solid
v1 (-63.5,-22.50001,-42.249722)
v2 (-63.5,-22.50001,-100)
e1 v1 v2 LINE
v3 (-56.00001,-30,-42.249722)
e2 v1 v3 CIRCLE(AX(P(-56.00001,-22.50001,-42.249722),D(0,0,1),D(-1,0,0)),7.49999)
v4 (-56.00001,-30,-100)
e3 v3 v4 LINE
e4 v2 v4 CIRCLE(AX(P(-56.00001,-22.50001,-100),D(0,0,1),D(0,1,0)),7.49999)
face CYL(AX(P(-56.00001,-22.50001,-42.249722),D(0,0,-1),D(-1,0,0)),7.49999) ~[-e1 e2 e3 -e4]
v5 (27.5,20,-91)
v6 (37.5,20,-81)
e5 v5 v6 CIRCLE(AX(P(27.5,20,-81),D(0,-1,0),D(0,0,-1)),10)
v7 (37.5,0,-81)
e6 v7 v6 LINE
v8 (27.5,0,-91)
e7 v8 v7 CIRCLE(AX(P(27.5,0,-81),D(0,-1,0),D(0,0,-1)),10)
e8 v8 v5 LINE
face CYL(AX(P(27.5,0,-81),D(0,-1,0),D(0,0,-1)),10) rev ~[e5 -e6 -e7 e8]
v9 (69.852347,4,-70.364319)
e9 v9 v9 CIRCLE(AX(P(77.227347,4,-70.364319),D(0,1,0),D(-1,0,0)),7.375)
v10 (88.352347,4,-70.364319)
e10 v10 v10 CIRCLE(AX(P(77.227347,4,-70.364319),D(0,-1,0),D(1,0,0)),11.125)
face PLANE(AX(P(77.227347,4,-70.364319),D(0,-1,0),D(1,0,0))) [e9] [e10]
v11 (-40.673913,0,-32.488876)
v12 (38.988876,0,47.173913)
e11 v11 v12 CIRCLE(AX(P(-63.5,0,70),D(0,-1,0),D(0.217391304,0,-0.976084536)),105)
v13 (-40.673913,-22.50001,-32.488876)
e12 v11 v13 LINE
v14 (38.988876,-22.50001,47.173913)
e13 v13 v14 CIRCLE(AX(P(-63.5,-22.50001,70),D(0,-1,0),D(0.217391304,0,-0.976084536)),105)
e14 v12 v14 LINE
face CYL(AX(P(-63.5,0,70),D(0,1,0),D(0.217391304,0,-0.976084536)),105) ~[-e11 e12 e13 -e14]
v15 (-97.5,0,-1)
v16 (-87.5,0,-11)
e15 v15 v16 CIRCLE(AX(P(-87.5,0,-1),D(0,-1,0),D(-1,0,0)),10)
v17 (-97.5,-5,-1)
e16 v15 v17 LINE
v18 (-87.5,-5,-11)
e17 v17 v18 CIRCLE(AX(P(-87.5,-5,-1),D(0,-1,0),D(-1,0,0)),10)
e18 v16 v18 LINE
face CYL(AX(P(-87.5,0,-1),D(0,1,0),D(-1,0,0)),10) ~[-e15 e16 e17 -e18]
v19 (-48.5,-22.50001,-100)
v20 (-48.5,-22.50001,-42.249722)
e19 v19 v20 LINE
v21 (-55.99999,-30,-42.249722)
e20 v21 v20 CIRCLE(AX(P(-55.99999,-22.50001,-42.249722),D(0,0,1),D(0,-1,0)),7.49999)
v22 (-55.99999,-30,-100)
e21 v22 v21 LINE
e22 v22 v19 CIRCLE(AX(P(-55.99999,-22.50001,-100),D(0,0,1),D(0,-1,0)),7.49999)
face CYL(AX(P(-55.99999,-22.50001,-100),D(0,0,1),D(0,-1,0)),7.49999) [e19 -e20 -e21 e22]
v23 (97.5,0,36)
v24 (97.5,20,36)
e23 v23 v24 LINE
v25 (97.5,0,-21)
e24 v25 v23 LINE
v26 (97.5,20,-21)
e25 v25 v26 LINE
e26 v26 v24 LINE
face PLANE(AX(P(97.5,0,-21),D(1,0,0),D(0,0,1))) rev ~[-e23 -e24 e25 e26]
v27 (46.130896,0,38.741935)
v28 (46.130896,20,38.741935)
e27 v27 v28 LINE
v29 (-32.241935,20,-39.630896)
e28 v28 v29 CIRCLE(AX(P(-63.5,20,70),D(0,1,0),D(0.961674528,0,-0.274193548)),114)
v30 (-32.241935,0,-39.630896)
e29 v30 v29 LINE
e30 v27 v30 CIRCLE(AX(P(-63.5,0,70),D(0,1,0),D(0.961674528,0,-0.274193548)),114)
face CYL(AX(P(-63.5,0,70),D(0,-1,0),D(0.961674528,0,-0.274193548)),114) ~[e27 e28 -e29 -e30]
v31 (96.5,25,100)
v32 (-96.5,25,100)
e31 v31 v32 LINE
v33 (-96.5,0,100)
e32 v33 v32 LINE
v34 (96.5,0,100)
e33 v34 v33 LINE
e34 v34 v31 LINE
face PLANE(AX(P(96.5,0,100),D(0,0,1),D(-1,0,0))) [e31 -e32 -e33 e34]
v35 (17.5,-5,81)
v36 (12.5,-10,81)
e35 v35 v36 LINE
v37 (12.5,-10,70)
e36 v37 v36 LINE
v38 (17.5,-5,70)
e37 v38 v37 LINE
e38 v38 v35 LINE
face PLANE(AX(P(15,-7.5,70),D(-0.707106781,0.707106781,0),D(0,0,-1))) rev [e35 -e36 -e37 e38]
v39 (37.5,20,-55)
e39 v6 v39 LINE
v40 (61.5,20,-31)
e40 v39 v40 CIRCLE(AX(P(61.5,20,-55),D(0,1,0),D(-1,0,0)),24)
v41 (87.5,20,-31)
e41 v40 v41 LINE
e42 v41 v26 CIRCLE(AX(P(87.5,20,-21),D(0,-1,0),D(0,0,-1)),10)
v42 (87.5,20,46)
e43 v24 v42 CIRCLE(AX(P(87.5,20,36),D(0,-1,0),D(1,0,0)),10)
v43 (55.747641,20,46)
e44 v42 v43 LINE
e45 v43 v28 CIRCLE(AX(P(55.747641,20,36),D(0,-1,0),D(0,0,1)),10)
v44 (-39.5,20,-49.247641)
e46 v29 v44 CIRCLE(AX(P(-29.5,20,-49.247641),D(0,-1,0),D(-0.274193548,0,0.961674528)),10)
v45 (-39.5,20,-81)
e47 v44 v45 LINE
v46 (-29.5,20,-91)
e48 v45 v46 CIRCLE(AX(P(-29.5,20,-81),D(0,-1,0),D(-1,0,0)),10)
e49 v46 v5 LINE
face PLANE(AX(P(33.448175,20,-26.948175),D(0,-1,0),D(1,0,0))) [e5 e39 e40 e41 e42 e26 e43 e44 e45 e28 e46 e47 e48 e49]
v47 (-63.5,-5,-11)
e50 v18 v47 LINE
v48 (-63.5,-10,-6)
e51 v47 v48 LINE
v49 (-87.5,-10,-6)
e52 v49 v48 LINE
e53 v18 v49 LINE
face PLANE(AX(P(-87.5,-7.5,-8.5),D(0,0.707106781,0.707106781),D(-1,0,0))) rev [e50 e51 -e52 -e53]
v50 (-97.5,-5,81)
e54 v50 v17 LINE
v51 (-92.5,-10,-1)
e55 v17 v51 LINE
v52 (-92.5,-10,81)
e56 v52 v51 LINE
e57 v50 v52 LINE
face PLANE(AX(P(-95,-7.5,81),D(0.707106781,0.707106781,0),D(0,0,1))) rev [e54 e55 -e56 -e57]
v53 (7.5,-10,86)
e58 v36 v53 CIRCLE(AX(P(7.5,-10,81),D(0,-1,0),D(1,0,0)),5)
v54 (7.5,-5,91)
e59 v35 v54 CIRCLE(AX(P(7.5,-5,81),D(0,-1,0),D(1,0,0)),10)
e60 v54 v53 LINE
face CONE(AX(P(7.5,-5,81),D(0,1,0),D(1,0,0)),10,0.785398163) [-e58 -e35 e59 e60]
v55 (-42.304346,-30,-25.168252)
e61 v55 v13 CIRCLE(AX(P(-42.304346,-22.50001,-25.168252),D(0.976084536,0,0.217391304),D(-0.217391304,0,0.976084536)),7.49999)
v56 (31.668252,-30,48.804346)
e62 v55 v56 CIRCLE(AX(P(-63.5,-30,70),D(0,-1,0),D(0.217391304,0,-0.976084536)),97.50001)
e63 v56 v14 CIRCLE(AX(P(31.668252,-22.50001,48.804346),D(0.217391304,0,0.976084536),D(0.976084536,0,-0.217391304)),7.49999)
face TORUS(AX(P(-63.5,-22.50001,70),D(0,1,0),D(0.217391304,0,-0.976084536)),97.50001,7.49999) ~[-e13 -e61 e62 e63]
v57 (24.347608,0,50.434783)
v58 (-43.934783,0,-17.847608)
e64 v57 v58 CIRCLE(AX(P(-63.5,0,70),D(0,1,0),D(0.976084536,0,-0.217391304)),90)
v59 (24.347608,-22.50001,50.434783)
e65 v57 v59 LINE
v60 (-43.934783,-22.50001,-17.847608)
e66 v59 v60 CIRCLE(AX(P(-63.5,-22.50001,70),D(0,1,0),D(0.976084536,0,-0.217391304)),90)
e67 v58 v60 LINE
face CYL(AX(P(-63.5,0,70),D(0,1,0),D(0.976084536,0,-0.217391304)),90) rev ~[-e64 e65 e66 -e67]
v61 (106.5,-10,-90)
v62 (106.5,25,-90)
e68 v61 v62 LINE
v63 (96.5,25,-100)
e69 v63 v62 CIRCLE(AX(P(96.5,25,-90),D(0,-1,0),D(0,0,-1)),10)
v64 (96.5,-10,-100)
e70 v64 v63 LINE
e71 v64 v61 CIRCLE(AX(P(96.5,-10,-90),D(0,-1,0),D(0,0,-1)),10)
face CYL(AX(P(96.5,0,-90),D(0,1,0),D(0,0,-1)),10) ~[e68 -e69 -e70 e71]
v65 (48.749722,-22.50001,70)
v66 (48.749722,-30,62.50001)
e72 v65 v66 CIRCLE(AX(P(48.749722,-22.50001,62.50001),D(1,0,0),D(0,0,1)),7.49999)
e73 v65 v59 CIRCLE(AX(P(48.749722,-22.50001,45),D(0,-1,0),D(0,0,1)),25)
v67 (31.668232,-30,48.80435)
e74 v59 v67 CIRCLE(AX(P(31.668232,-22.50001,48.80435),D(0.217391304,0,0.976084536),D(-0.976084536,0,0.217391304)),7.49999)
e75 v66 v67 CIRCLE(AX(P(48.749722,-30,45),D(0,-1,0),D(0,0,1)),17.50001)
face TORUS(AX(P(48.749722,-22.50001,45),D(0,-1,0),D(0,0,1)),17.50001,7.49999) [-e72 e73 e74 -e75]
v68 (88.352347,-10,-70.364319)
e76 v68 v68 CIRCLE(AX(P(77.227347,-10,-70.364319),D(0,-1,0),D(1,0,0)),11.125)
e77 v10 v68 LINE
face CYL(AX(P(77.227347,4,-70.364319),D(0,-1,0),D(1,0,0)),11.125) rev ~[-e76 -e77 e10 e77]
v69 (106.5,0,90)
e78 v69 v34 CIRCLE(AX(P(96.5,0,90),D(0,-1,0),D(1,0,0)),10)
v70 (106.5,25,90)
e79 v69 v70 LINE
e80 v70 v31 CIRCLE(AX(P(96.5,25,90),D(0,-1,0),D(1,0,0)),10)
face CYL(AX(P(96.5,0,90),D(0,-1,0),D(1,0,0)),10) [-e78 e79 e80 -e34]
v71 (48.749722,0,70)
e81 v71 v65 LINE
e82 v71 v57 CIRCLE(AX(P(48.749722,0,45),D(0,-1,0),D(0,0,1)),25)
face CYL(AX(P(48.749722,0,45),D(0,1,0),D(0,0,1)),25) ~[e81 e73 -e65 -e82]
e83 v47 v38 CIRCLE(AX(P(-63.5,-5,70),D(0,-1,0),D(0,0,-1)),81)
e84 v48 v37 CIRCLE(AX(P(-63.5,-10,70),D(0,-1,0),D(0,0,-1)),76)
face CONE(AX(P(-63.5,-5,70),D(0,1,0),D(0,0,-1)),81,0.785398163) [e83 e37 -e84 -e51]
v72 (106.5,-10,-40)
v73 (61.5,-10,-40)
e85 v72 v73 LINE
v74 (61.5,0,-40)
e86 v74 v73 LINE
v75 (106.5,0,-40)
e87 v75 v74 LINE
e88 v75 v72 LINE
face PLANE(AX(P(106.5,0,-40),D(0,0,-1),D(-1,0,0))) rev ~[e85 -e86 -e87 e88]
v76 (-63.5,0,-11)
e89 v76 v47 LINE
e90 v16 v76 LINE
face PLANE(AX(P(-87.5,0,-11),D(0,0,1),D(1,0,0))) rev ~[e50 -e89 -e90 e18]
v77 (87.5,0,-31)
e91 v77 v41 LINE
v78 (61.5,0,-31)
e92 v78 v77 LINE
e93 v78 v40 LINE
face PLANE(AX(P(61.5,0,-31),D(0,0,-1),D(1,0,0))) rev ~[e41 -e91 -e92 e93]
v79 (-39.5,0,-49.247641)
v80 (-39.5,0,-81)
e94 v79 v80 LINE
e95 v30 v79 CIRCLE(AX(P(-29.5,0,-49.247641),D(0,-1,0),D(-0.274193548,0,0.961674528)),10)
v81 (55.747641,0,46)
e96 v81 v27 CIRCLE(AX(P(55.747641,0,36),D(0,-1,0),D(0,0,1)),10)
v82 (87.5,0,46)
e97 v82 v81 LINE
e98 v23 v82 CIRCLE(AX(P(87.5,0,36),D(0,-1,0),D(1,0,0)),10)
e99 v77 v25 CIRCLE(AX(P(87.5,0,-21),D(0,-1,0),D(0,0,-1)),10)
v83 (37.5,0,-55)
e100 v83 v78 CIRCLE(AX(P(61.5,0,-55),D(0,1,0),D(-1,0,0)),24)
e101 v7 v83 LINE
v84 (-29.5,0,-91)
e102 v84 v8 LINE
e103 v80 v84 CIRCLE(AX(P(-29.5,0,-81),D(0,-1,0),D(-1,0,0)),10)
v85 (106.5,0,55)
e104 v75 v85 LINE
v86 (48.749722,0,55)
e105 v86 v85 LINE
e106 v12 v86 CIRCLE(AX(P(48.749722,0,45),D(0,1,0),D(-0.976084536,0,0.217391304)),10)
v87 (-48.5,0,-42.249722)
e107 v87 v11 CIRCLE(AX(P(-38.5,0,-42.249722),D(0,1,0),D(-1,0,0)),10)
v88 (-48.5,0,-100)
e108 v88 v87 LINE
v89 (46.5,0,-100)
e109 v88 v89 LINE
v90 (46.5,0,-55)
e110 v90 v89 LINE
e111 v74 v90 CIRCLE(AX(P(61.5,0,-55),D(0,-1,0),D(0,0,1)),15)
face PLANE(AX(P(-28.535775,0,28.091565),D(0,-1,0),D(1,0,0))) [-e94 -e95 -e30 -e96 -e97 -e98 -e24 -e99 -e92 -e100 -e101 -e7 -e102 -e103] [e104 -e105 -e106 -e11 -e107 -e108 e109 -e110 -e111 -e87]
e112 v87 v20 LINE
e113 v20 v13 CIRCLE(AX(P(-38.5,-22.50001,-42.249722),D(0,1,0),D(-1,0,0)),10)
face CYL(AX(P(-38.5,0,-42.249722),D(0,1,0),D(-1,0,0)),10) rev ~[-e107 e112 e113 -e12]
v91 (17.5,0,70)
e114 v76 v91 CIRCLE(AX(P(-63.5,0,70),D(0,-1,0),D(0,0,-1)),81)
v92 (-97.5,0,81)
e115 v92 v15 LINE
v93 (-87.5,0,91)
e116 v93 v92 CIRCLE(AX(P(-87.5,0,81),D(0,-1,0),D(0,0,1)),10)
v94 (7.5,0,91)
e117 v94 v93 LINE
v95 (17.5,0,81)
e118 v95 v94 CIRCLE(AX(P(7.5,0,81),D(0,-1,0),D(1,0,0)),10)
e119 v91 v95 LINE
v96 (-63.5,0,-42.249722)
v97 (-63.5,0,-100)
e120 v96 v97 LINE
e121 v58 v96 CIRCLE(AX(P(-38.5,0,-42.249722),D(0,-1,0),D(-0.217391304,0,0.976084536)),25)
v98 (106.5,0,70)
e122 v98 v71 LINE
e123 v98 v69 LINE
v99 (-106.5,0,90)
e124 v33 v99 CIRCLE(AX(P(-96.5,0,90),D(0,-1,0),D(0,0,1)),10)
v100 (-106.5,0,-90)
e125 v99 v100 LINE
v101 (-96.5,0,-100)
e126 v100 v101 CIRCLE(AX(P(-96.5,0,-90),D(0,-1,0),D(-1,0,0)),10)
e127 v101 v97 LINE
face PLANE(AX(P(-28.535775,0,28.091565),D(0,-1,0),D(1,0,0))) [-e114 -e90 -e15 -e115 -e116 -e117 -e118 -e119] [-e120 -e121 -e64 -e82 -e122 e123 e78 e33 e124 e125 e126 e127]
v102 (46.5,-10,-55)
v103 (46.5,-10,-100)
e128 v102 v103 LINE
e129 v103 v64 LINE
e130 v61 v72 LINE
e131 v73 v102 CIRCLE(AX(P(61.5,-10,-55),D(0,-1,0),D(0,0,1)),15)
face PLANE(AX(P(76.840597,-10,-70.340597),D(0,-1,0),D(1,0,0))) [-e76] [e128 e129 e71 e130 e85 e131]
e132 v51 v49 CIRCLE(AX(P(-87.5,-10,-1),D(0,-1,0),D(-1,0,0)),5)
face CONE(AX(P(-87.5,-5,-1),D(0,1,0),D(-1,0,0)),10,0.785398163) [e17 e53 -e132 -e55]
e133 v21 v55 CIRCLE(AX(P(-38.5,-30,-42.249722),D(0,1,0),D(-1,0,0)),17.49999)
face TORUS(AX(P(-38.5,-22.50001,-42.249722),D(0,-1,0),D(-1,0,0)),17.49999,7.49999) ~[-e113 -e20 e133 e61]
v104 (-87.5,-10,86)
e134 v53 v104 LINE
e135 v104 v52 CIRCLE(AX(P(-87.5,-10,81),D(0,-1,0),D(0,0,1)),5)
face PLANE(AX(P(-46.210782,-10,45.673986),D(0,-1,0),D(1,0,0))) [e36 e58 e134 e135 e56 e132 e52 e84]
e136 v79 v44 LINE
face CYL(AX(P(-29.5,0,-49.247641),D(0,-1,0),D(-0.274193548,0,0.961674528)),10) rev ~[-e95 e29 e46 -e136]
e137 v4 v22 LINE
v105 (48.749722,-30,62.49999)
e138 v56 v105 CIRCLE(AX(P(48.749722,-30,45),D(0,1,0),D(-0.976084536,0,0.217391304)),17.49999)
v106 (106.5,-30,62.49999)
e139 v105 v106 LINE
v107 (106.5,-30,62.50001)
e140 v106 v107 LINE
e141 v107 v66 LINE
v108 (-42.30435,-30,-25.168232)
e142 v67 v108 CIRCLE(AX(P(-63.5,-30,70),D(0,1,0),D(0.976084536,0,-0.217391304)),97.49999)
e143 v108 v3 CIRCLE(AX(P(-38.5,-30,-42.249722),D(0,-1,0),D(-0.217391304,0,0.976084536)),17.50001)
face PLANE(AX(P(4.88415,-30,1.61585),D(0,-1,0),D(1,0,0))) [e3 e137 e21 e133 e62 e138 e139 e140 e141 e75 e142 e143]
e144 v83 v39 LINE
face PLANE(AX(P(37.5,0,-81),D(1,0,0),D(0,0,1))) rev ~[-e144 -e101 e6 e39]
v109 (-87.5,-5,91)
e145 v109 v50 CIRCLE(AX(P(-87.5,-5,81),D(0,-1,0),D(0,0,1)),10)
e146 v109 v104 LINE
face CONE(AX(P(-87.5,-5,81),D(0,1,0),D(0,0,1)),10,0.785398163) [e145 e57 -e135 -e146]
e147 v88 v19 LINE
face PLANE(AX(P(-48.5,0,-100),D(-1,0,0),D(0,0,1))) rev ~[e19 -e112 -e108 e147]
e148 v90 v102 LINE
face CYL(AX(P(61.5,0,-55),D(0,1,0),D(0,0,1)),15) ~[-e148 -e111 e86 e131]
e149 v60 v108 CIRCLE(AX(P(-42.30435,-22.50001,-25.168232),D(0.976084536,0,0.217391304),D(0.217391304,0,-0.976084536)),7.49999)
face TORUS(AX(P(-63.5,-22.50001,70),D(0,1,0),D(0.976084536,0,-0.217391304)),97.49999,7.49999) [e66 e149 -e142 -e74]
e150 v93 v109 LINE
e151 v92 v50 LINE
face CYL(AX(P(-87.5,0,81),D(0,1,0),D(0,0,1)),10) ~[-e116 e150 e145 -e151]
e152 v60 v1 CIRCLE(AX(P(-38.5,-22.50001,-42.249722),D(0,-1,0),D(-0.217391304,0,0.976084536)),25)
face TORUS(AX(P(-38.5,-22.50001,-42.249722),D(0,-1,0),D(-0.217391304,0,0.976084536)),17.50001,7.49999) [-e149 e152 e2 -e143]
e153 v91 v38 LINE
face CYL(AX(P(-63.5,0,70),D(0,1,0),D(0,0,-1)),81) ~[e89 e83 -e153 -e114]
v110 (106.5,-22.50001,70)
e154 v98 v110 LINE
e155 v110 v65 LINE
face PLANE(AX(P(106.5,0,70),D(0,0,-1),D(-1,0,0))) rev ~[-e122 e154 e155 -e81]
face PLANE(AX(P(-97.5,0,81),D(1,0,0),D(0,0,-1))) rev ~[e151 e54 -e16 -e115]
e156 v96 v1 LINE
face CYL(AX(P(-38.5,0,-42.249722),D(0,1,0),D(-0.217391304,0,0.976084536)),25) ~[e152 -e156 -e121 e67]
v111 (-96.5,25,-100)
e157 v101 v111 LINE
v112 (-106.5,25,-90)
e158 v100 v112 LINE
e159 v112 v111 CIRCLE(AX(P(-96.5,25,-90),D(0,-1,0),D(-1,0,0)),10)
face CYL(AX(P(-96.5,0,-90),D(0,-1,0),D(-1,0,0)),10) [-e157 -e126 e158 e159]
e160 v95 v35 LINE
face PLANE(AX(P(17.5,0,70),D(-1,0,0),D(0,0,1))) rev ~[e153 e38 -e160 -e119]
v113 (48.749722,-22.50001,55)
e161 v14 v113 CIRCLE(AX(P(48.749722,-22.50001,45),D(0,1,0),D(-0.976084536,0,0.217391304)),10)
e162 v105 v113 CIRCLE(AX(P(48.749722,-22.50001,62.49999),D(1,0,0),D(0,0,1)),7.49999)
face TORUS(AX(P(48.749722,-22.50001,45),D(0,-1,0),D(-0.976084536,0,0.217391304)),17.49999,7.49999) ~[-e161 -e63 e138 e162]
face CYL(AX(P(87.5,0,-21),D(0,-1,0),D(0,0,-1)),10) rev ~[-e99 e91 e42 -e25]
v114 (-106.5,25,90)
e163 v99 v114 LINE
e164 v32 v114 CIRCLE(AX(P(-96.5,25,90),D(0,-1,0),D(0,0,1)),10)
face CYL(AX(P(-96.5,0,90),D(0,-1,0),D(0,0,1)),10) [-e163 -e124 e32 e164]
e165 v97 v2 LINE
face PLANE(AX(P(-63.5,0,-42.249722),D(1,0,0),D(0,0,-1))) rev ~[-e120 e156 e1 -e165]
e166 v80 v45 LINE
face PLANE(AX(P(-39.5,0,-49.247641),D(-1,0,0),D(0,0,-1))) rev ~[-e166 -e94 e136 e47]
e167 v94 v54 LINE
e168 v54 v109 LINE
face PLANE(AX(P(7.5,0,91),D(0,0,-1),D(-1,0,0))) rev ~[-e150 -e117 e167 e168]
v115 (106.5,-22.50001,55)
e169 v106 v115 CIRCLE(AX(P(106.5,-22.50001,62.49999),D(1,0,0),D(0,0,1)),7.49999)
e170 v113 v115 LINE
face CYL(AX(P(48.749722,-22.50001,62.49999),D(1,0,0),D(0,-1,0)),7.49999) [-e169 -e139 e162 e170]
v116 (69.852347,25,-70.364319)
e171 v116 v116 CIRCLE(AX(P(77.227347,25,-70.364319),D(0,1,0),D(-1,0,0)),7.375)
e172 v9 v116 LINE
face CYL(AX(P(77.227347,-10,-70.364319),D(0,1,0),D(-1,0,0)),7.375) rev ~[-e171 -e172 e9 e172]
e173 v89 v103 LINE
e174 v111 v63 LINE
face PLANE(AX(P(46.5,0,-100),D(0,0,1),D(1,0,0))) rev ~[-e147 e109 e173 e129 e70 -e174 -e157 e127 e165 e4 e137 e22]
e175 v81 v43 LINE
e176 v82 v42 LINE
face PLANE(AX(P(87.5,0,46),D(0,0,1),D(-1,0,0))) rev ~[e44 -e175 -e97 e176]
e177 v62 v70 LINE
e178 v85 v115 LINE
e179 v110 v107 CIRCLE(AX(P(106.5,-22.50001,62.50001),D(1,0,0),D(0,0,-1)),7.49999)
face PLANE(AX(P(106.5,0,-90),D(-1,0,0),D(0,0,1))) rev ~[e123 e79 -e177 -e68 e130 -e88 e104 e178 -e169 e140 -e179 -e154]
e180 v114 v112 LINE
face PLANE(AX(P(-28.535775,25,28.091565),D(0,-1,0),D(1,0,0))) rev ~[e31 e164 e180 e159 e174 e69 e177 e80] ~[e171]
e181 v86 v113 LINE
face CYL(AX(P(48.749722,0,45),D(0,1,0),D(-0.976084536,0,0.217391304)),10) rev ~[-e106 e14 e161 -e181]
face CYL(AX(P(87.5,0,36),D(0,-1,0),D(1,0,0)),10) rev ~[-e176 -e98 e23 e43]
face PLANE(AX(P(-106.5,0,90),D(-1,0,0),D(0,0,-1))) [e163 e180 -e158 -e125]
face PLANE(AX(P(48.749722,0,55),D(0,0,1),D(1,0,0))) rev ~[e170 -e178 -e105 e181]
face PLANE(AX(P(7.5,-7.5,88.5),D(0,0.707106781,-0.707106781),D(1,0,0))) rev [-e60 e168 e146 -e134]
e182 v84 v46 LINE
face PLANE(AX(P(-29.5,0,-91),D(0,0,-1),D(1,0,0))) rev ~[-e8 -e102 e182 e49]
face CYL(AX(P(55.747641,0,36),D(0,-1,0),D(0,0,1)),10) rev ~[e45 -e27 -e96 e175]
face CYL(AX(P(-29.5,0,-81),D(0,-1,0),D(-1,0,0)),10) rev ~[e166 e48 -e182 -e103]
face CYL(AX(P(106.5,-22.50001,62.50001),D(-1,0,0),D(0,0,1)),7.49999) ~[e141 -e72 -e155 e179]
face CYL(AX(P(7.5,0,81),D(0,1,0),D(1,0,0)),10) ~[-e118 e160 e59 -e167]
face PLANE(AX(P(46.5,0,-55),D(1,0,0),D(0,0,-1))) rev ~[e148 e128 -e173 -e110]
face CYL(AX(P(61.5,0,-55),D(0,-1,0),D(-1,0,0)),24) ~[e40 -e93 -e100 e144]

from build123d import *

# Parameters (mm, degrees)
F1_DEPTH       = 25
F2_DEPTH       = 10
F3_DEPTH       = 30
F4_DEPTH       = 20
F5_DEPTH       = 10
F7_D           = 14.75
F7_CBORE_D     = 22.25
F7_CBORE_DEPTH = 14
F8_SIZE        = 5
F9_R           = 7.49999


# Not quite as in the source:
# - a fillet or chamfer is up to 0.001 mm smaller than in the source, because OpenCascade refuses the exact size


with BuildPart() as f1:
    # F0 (on Front) → F1 (new body)
    with BuildSketch(Plane.XZ):
        with BuildLine():
            Line((96.5, 100), (-96.5, 100))
            ThreePointArc((-96.5, 100), (-103.5710678119, 97.0710678119), (-106.5, 90))
            Line((-106.5, 90), (-106.5, -90))
            ThreePointArc((-106.5, -90), (-103.5710678119, -97.0710678119), (-96.5, -100))
            Line((-96.5, -100), (-63.5, -100))
            Line((-63.5, -100), (-63.5, -42.2497216032))
            ThreePointArc((-63.5, -42.2497216032), (-58.0047374401, -26.6111405489), (-43.9347826087, -17.8476082112))
            ThreePointArc((-43.9347826087, -17.8476082112), (0.1396103068, 6.3603896932), (24.3476082112, 50.4347826087))
            ThreePointArc((24.3476082112, 50.4347826087), (33.1111405489, 64.5047374401), (48.7497216032, 70))
            Line((48.7497216032, 70), (106.5, 70))
            Line((106.5, 70), (106.5, 90))
            ThreePointArc((106.5, 90), (103.5710678119, 97.0710678119), (96.5, 100))
        make_face()
        with BuildLine():
            ThreePointArc((17.5, 70), (-6.2243507239, 12.7243507239), (-63.5, -11))
            Line((-63.5, -11), (-87.5, -11))
            ThreePointArc((-87.5, -11), (-94.5710678119, -8.0710678119), (-97.5, -1))
            Line((-97.5, -1), (-97.5, 81))
            ThreePointArc((-97.5, 81), (-94.5710678119, 88.0710678119), (-87.5, 91))
            Line((-87.5, 91), (7.5, 91))
            ThreePointArc((7.5, 91), (14.5710678119, 88.0710678119), (17.5, 81))
            Line((17.5, 81), (17.5, 70))
        make_face(mode=Mode.SUBTRACT)
        with BuildLine():
            Line((106.5, 55), (106.5, 70))
            Line((106.5, 70), (48.7497216032, 70))
            ThreePointArc((48.7497216032, 70), (33.1111405489, 64.5047374401), (24.3476082112, 50.4347826087))
            ThreePointArc((24.3476082112, 50.4347826087), (0.1396103068, 6.3603896932), (-43.9347826087, -17.8476082112))
            ThreePointArc((-43.9347826087, -17.8476082112), (-58.0047374401, -26.6111405489), (-63.5, -42.2497216032))
            Line((-63.5, -42.2497216032), (-63.5, -100))
            Line((-63.5, -100), (-48.5, -100))
            Line((-48.5, -100), (-48.5, -42.2497216032))
            ThreePointArc((-48.5, -42.2497216032), (-46.3018949761, -35.9942891815), (-40.6739130435, -32.4888762464))
            ThreePointArc((-40.6739130435, -32.4888762464), (10.7462120246, -4.2462120246), (38.9888762464, 47.1739130435))
            ThreePointArc((38.9888762464, 47.1739130435), (42.4942891815, 52.8018949761), (48.7497216032, 55))
            Line((48.7497216032, 55), (106.5, 55))
        make_face()
        with BuildLine():
            Line((106.5, -40), (106.5, 55))
            Line((106.5, 55), (48.7497216032, 55))
            ThreePointArc((48.7497216032, 55), (42.4942891815, 52.8018949761), (38.9888762464, 47.1739130435))
            ThreePointArc((38.9888762464, 47.1739130435), (10.7462120246, -4.2462120246), (-40.6739130435, -32.4888762464))
            ThreePointArc((-40.6739130435, -32.4888762464), (-46.3018949761, -35.9942891815), (-48.5, -42.2497216032))
            Line((-48.5, -42.2497216032), (-48.5, -100))
            Line((-48.5, -100), (46.5, -100))
            Line((46.5, -100), (46.5, -55))
            ThreePointArc((46.5, -55), (50.8933982822, -44.3933982822), (61.5, -40))
            Line((61.5, -40), (106.5, -40))
        make_face()
        with BuildLine():
            ThreePointArc((46.130896205, 38.7419354839), (49.7234965193, 43.981834214), (55.7476414861, 46))
            Line((55.7476414861, 46), (87.5, 46))
            ThreePointArc((87.5, 46), (94.5710678119, 43.0710678119), (97.5, 36))
            Line((97.5, 36), (97.5, -21))
            ThreePointArc((97.5, -21), (94.5710678119, -28.0710678119), (87.5, -31))
            Line((87.5, -31), (61.5, -31))
            ThreePointArc((61.5, -31), (44.5294372515, -38.0294372515), (37.5, -55))
            Line((37.5, -55), (37.5, -81))
            ThreePointArc((37.5, -81), (34.5710678119, -88.0710678119), (27.5, -91))
            Line((27.5, -91), (-29.5, -91))
            ThreePointArc((-29.5, -91), (-36.5710678119, -88.0710678119), (-39.5, -81))
            Line((-39.5, -81), (-39.5, -49.2476414861))
            ThreePointArc((-39.5, -49.2476414861), (-37.481834214, -43.2234965193), (-32.2419354839, -39.630896205))
            ThreePointArc((-32.2419354839, -39.630896205), (17.1101730553, -10.6101730553), (46.130896205, 38.7419354839))
        make_face(mode=Mode.SUBTRACT)
        with BuildLine():
            Line((106.5, -90), (106.5, -40))
            Line((106.5, -40), (61.5, -40))
            ThreePointArc((61.5, -40), (50.8933982822, -44.3933982822), (46.5, -55))
            Line((46.5, -55), (46.5, -100))
            Line((46.5, -100), (96.5, -100))
            ThreePointArc((96.5, -100), (103.5710678119, -97.0710678119), (106.5, -90))
        make_face()
        with BuildLine():
            Line((-87.5, -11), (-63.5, -11))
            ThreePointArc((-63.5, -11), (-6.2243507239, 12.7243507239), (17.5, 70))
            Line((17.5, 70), (17.5, 81))
            ThreePointArc((17.5, 81), (14.5710678119, 88.0710678119), (7.5, 91))
            Line((7.5, 91), (-87.5, 91))
            ThreePointArc((-87.5, 91), (-94.5710678119, 88.0710678119), (-97.5, 81))
            Line((-97.5, 81), (-97.5, -1))
            ThreePointArc((-97.5, -1), (-94.5710678119, -8.0710678119), (-87.5, -11))
        make_face()
        with BuildLine():
            Line((87.5, 46), (55.7476414861, 46))
            ThreePointArc((55.7476414861, 46), (49.7234965193, 43.981834214), (46.130896205, 38.7419354839))
            ThreePointArc((46.130896205, 38.7419354839), (17.1101730553, -10.6101730553), (-32.2419354839, -39.630896205))
            ThreePointArc((-32.2419354839, -39.630896205), (-37.481834214, -43.2234965193), (-39.5, -49.2476414861))
            Line((-39.5, -49.2476414861), (-39.5, -81))
            ThreePointArc((-39.5, -81), (-36.5710678119, -88.0710678119), (-29.5, -91))
            Line((-29.5, -91), (27.5, -91))
            ThreePointArc((27.5, -91), (34.5710678119, -88.0710678119), (37.5, -81))
            Line((37.5, -81), (37.5, -55))
            ThreePointArc((37.5, -55), (44.5294372515, -38.0294372515), (61.5, -31))
            Line((61.5, -31), (87.5, -31))
            ThreePointArc((87.5, -31), (94.5710678119, -28.0710678119), (97.5, -21))
            Line((97.5, -21), (97.5, 36))
            ThreePointArc((97.5, 36), (94.5710678119, 43.0710678119), (87.5, 46))
        make_face()
    extrude(amount=-F1_DEPTH)

    # F0 (on Front) → F2 (join)
    with BuildSketch(Plane.XZ):
        with BuildLine():
            Line((-87.5, -11), (-63.5, -11))
            ThreePointArc((-63.5, -11), (-6.2243507239, 12.7243507239), (17.5, 70))
            Line((17.5, 70), (17.5, 81))
            ThreePointArc((17.5, 81), (14.5710678119, 88.0710678119), (7.5, 91))
            Line((7.5, 91), (-87.5, 91))
            ThreePointArc((-87.5, 91), (-94.5710678119, 88.0710678119), (-97.5, 81))
            Line((-97.5, 81), (-97.5, -1))
            ThreePointArc((-97.5, -1), (-94.5710678119, -8.0710678119), (-87.5, -11))
        make_face()
    extrude(amount=F2_DEPTH)

    # F0 (on Front) → F3 (join)
    with BuildSketch(Plane.XZ):
        with BuildLine():
            Line((106.5, 55), (106.5, 70))
            Line((106.5, 70), (48.7497216032, 70))
            ThreePointArc((48.7497216032, 70), (33.1111405489, 64.5047374401), (24.3476082112, 50.4347826087))
            ThreePointArc((24.3476082112, 50.4347826087), (0.1396103068, 6.3603896932), (-43.9347826087, -17.8476082112))
            ThreePointArc((-43.9347826087, -17.8476082112), (-58.0047374401, -26.6111405489), (-63.5, -42.2497216032))
            Line((-63.5, -42.2497216032), (-63.5, -100))
            Line((-63.5, -100), (-48.5, -100))
            Line((-48.5, -100), (-48.5, -42.2497216032))
            ThreePointArc((-48.5, -42.2497216032), (-46.3018949761, -35.9942891815), (-40.6739130435, -32.4888762464))
            ThreePointArc((-40.6739130435, -32.4888762464), (10.7462120246, -4.2462120246), (38.9888762464, 47.1739130435))
            ThreePointArc((38.9888762464, 47.1739130435), (42.4942891815, 52.8018949761), (48.7497216032, 55))
            Line((48.7497216032, 55), (106.5, 55))
        make_face()
    extrude(amount=F3_DEPTH)

    # F0 (on Front) → F4 (cut)
    with BuildSketch(Plane.XZ):
        with BuildLine():
            Line((87.5, 46), (55.7476414861, 46))
            ThreePointArc((55.7476414861, 46), (49.7234965193, 43.981834214), (46.130896205, 38.7419354839))
            ThreePointArc((46.130896205, 38.7419354839), (17.1101730553, -10.6101730553), (-32.2419354839, -39.630896205))
            ThreePointArc((-32.2419354839, -39.630896205), (-37.481834214, -43.2234965193), (-39.5, -49.2476414861))
            Line((-39.5, -49.2476414861), (-39.5, -81))
            ThreePointArc((-39.5, -81), (-36.5710678119, -88.0710678119), (-29.5, -91))
            Line((-29.5, -91), (27.5, -91))
            ThreePointArc((27.5, -91), (34.5710678119, -88.0710678119), (37.5, -81))
            Line((37.5, -81), (37.5, -55))
            ThreePointArc((37.5, -55), (44.5294372515, -38.0294372515), (61.5, -31))
            Line((61.5, -31), (87.5, -31))
            ThreePointArc((87.5, -31), (94.5710678119, -28.0710678119), (97.5, -21))
            Line((97.5, -21), (97.5, 36))
            ThreePointArc((97.5, 36), (94.5710678119, 43.0710678119), (87.5, 46))
        make_face()
    extrude(amount=-F4_DEPTH, mode=Mode.SUBTRACT)

    # F0 (on Front) → F5 (join)
    with BuildSketch(Plane.XZ):
        with BuildLine():
            Line((106.5, -90), (106.5, -40))
            Line((106.5, -40), (61.5, -40))
            ThreePointArc((61.5, -40), (50.8933982822, -44.3933982822), (46.5, -55))
            Line((46.5, -55), (46.5, -100))
            Line((46.5, -100), (96.5, -100))
            ThreePointArc((96.5, -100), (103.5710678119, -97.0710678119), (106.5, -90))
        make_face()
    extrude(amount=F5_DEPTH)

    # F7 (through all)
    with Locations(Plane.XZ.offset(10)):
        with Locations((77.2273465991, -70.3643187881)):
            CounterBoreHole(F7_D / 2, F7_CBORE_D / 2, F7_CBORE_DEPTH)

    # F8
    f8_edges = [f1.edges().sort_by_distance(p)[0] for p in [
        (-97.5, -10, 40),
    ]]
    chamfer(f8_edges, length=F8_SIZE)

    # F9 (radius 7.5 in the source; OpenCascade refuses exactly that, so slightly less here)
    f9_edges = [f1.edges().sort_by_distance(p)[0] for p in [
        (-63.5, -30, -71.124861),
        (-48.5, -30, -71.124861),
    ]]
    fillet(f9_edges, radius=F9_R)


solid = f1.part
